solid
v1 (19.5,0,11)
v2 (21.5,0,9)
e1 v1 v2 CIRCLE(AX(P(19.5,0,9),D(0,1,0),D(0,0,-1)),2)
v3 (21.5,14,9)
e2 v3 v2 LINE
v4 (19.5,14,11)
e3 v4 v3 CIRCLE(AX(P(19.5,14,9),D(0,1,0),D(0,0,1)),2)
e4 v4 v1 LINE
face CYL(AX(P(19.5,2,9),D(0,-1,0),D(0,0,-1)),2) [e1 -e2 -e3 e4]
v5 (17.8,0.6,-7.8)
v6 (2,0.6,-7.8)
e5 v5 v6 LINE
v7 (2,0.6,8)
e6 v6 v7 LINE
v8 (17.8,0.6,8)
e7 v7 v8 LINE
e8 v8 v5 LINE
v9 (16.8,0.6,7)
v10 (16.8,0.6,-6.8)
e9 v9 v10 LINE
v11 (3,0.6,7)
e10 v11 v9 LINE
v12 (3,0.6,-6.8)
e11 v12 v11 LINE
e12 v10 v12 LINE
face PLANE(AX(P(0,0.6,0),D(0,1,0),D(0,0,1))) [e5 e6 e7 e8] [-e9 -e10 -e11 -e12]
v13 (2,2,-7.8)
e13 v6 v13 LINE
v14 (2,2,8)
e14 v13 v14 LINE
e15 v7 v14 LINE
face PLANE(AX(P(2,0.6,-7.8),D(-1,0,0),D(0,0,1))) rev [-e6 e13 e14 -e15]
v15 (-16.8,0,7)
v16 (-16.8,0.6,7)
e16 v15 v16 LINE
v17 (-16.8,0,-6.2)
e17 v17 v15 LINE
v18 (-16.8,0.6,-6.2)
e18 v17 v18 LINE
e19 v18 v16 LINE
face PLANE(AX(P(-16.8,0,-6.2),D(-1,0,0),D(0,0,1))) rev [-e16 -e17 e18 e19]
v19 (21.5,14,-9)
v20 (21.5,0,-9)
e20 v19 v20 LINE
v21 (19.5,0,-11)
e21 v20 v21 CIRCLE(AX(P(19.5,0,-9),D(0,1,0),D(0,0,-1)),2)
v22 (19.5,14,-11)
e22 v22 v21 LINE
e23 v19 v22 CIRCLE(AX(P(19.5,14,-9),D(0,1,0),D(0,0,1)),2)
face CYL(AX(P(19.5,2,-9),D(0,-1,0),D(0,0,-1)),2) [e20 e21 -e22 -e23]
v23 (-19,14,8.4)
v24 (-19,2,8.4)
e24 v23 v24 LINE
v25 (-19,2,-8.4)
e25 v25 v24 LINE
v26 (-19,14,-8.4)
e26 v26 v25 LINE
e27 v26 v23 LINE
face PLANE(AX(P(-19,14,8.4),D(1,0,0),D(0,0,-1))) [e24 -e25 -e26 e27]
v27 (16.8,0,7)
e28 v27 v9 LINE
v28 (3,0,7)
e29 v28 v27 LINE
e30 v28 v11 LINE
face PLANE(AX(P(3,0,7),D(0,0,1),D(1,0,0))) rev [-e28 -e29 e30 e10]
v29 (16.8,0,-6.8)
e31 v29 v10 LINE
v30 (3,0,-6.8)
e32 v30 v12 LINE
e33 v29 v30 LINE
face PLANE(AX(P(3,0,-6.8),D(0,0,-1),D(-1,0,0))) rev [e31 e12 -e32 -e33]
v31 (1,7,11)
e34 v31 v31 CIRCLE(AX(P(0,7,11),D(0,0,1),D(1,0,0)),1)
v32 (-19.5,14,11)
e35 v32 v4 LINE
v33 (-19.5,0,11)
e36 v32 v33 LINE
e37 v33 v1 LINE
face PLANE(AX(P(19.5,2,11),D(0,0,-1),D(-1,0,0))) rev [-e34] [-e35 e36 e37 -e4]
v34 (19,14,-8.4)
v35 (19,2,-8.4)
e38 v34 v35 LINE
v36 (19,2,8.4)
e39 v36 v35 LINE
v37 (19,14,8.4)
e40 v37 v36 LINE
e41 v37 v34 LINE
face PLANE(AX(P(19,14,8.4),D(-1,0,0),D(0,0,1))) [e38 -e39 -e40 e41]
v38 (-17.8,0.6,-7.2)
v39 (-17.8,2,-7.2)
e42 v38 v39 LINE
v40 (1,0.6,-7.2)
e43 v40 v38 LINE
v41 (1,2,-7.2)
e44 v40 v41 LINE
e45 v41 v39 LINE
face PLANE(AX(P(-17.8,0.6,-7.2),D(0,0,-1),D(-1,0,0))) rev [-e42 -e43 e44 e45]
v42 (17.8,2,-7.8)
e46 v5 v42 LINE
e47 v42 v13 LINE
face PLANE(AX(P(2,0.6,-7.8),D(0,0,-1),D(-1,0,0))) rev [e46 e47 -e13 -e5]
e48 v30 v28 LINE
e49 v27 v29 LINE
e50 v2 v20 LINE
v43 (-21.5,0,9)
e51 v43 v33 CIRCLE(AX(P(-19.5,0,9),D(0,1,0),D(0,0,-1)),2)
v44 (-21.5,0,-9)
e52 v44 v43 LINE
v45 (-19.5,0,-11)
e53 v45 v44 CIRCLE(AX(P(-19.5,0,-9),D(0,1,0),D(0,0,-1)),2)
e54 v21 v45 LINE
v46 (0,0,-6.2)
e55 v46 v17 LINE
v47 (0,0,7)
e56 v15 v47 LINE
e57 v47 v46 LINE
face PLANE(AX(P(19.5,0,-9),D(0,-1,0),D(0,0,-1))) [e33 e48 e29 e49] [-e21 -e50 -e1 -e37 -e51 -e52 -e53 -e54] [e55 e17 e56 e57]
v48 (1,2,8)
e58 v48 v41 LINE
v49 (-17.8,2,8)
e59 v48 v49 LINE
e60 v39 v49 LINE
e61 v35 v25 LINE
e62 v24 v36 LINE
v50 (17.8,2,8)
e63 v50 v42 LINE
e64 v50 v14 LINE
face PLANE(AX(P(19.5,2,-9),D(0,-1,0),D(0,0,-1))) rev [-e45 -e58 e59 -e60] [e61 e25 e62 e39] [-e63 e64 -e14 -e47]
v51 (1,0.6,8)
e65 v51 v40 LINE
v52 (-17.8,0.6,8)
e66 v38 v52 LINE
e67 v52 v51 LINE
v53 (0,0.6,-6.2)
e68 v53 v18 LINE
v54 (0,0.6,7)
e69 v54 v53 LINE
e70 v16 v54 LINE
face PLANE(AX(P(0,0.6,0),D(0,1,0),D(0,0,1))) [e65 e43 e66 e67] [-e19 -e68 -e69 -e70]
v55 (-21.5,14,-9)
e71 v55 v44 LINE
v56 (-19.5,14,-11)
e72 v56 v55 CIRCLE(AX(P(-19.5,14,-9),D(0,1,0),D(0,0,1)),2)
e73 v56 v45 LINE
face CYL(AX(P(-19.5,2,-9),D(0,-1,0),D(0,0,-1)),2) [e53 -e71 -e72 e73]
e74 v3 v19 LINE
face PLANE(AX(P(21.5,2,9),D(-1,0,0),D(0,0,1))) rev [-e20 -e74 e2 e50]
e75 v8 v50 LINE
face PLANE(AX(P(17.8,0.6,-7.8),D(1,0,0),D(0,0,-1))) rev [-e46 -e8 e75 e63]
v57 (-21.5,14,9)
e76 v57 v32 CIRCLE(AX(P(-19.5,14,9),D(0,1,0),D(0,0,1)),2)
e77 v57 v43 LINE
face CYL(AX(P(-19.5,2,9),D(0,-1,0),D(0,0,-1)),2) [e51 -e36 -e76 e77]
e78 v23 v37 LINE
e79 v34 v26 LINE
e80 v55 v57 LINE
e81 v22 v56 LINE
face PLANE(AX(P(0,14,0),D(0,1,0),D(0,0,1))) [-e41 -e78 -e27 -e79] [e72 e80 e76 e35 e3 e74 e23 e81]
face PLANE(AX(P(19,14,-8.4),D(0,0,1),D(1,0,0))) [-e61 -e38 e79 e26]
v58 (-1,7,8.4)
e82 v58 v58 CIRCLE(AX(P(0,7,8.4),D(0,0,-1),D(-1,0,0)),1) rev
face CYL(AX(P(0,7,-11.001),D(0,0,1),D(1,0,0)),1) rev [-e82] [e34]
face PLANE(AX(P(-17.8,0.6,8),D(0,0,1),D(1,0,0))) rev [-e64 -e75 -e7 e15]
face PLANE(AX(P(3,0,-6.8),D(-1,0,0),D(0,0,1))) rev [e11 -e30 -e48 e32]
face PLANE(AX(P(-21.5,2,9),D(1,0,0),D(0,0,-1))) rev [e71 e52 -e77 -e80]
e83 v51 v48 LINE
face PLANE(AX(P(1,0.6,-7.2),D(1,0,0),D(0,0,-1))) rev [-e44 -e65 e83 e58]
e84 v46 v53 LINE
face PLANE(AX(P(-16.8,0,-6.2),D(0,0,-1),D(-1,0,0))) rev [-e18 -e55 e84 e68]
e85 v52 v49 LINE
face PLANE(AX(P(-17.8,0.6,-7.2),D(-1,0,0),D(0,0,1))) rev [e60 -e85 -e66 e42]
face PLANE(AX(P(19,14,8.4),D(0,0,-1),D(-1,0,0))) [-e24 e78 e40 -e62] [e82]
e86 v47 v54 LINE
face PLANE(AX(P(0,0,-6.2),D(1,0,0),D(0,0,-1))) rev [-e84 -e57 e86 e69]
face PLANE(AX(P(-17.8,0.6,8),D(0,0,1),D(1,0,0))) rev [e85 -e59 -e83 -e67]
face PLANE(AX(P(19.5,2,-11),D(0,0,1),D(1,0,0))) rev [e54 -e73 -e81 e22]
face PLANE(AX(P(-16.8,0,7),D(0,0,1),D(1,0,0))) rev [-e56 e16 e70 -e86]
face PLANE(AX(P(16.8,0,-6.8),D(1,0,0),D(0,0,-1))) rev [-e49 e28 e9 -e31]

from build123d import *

# Parameters (mm, degrees)
BOSS_EXTRUDE1_DEPTH = 2
SKETCH2_W           = 18.8
SKETCH2_H           = 15.2
SKETCH2_W_2         = 15.8
SKETCH2_H_2         = 15.8
CUT_EXTRUDE1_DEPTH  = 1.4
SKETCH3_W           = 16.8
SKETCH3_H           = 13.2
SKETCH3_W_2         = 13.8
SKETCH3_H_2         = 13.8
CUT_EXTRUDE2_DEPTH  = 25.191114071
BOSS_EXTRUDE3_DEPTH = 12
FILLET1_R           = 10
SKETCH15_W          = 38
SKETCH15_H          = 16.8
CUT_EXTRUDE3_DEPTH  = 27.96757312
CUT_EXTRUDE5_REACH  = 35.797
SKETCH17_R          = 1


with BuildPart() as part:
    # Sketch1 → Boss-Extrude1 (new body)
    with BuildSketch(Plane(origin=(0, 0, 0), x_dir=(1, 0, 0), z_dir=(0, 1, 0))):
        with BuildLine():
            Line((19.5, -11), (-19.5, -11))
            ThreePointArc((-19.5, -11), (-20.914213562, -10.414213562), (-21.5, -9))
            Line((-21.5, -9), (-21.5, 9))
            ThreePointArc((-21.5, 9), (-20.914213562, 10.414213562), (-19.5, 11))
            Line((-19.5, 11), (19.5, 11))
            ThreePointArc((19.5, 11), (20.914213562, 10.414213562), (21.5, 9))
            Line((21.5, 9), (21.5, -9))
            ThreePointArc((21.5, -9), (20.914213562, -10.414213562), (19.5, -11))
        make_face()
    extrude(amount=BOSS_EXTRUDE1_DEPTH)

    # Sketch2 → Cut-Extrude1 (cut)
    with BuildSketch(Plane(origin=(0, 2, 0), x_dir=(1, 0, 0), z_dir=(0, 1, 0))):
        with Locations((-8.4, -0.4)):
            Rectangle(SKETCH2_W, SKETCH2_H)
        with Locations((9.9, -0.1)):
            Rectangle(SKETCH2_W_2, SKETCH2_H_2)
    extrude(amount=-CUT_EXTRUDE1_DEPTH, mode=Mode.SUBTRACT)

    # Sketch3 → Cut-Extrude2 (cut, through all)
    with BuildSketch(Plane(origin=(0, 0.6, 0), x_dir=(1, 0, 0), z_dir=(0, 1, 0))):
        with Locations((-8.4, -0.4)):
            Rectangle(SKETCH3_W, SKETCH3_H)
        with Locations((9.9, -0.1)):
            Rectangle(SKETCH3_W_2, SKETCH3_H_2)
    extrude(amount=-CUT_EXTRUDE2_DEPTH, mode=Mode.SUBTRACT)

    # Sketch13 → Boss-Extrude3 (add)
    with BuildSketch(Plane(origin=(0, 2, 0), x_dir=(1, 0, 0), z_dir=(0, 1, 0))):
        with BuildLine():
            ThreePointArc((-21.5, -9), (-20.914213562, -10.414213562), (-19.5, -11))
            Line((-19.5, -11), (19.5, -11))
            ThreePointArc((19.5, -11), (20.914213562, -10.414213562), (21.5, -9))
            Line((21.5, -9), (21.5, 9))
            ThreePointArc((21.5, 9), (20.914213562, 10.414213562), (19.5, 11))
            Line((19.5, 11), (-19.5, 11))
            ThreePointArc((-19.5, 11), (-20.914213562, 10.414213562), (-21.5, 9))
            Line((-21.5, 9), (-21.5, -9))
        make_face()
        with BuildLine():
            ThreePointArc((17.5, 8), (18.207106781, 7.707106781), (18.5, 7))
            Line((18.5, 7), (18.5, -7))
            ThreePointArc((18.5, -7), (18.306225775, -7.591607978), (17.8, -7.953939201))
            Line((17.8, -7.953939201), (17.8, -8))
            Line((17.8, -8), (-17.8, -8))
            Line((-17.8, -8), (-17.8, -7.953939201))
            ThreePointArc((-17.8, -7.953939201), (-18.306225775, -7.591607978), (-18.5, -7))
            Line((-18.5, -7), (-18.5, 7))
            ThreePointArc((-18.5, 7), (-18.207106781, 7.707106781), (-17.5, 8))
            Line((-17.5, 8), (17.5, 8))
        make_face(mode=Mode.SUBTRACT)
    extrude(amount=BOSS_EXTRUDE3_DEPTH)

    # Fillet1
    # the kernel refuses this fillet: 10 mm, written as the material it takes off along each edge
    with BuildSketch(Plane(origin=(17.8, 2, 7.953939201), x_dir=(0.906100611464274, 0, -0.42306226717123885), z_dir=(0, 1, 0))) as fillet1_piece_1:
        with BuildLine():
            CenterArc((1.580945974, -9.912835739), FILLET1_R, 97.570469618, 1.638937345)
            Line((-0.019486586, -0.041735718), (0, 0))
            ThreePointArc((0, 0), (0.131745498, -0.008716426), (0.263490996, 0))
        make_face()
    extrude(amount=12.658727489, mode=Mode.SUBTRACT)

    # Sketch15 → Cut-Extrude3 (cut, through all)
    with BuildSketch(Plane(origin=(0, 2, 0), x_dir=(1, 0, 0), z_dir=(0, 1, 0))):
        Rectangle(SKETCH15_W, SKETCH15_H)
    extrude(amount=CUT_EXTRUDE3_DEPTH, mode=Mode.SUBTRACT)

    # Sketch17 → Cut-Extrude5 (cut, up to next)
    with BuildSketch(Plane.XY.offset(11), mode=Mode.PRIVATE) as cut_extrude5_sk1:
        with Locations((0, 7)):
            Circle(SKETCH17_R)
    cut_extrude5_tool1 = extrude(cut_extrude5_sk1.sketch, amount=-CUT_EXTRUDE5_REACH, mode=Mode.PRIVATE) & part.part
    add(cut_extrude5_tool1.solids().sort_by_distance((0, 7, 11))[0], mode=Mode.SUBTRACT)


solid = part.part
